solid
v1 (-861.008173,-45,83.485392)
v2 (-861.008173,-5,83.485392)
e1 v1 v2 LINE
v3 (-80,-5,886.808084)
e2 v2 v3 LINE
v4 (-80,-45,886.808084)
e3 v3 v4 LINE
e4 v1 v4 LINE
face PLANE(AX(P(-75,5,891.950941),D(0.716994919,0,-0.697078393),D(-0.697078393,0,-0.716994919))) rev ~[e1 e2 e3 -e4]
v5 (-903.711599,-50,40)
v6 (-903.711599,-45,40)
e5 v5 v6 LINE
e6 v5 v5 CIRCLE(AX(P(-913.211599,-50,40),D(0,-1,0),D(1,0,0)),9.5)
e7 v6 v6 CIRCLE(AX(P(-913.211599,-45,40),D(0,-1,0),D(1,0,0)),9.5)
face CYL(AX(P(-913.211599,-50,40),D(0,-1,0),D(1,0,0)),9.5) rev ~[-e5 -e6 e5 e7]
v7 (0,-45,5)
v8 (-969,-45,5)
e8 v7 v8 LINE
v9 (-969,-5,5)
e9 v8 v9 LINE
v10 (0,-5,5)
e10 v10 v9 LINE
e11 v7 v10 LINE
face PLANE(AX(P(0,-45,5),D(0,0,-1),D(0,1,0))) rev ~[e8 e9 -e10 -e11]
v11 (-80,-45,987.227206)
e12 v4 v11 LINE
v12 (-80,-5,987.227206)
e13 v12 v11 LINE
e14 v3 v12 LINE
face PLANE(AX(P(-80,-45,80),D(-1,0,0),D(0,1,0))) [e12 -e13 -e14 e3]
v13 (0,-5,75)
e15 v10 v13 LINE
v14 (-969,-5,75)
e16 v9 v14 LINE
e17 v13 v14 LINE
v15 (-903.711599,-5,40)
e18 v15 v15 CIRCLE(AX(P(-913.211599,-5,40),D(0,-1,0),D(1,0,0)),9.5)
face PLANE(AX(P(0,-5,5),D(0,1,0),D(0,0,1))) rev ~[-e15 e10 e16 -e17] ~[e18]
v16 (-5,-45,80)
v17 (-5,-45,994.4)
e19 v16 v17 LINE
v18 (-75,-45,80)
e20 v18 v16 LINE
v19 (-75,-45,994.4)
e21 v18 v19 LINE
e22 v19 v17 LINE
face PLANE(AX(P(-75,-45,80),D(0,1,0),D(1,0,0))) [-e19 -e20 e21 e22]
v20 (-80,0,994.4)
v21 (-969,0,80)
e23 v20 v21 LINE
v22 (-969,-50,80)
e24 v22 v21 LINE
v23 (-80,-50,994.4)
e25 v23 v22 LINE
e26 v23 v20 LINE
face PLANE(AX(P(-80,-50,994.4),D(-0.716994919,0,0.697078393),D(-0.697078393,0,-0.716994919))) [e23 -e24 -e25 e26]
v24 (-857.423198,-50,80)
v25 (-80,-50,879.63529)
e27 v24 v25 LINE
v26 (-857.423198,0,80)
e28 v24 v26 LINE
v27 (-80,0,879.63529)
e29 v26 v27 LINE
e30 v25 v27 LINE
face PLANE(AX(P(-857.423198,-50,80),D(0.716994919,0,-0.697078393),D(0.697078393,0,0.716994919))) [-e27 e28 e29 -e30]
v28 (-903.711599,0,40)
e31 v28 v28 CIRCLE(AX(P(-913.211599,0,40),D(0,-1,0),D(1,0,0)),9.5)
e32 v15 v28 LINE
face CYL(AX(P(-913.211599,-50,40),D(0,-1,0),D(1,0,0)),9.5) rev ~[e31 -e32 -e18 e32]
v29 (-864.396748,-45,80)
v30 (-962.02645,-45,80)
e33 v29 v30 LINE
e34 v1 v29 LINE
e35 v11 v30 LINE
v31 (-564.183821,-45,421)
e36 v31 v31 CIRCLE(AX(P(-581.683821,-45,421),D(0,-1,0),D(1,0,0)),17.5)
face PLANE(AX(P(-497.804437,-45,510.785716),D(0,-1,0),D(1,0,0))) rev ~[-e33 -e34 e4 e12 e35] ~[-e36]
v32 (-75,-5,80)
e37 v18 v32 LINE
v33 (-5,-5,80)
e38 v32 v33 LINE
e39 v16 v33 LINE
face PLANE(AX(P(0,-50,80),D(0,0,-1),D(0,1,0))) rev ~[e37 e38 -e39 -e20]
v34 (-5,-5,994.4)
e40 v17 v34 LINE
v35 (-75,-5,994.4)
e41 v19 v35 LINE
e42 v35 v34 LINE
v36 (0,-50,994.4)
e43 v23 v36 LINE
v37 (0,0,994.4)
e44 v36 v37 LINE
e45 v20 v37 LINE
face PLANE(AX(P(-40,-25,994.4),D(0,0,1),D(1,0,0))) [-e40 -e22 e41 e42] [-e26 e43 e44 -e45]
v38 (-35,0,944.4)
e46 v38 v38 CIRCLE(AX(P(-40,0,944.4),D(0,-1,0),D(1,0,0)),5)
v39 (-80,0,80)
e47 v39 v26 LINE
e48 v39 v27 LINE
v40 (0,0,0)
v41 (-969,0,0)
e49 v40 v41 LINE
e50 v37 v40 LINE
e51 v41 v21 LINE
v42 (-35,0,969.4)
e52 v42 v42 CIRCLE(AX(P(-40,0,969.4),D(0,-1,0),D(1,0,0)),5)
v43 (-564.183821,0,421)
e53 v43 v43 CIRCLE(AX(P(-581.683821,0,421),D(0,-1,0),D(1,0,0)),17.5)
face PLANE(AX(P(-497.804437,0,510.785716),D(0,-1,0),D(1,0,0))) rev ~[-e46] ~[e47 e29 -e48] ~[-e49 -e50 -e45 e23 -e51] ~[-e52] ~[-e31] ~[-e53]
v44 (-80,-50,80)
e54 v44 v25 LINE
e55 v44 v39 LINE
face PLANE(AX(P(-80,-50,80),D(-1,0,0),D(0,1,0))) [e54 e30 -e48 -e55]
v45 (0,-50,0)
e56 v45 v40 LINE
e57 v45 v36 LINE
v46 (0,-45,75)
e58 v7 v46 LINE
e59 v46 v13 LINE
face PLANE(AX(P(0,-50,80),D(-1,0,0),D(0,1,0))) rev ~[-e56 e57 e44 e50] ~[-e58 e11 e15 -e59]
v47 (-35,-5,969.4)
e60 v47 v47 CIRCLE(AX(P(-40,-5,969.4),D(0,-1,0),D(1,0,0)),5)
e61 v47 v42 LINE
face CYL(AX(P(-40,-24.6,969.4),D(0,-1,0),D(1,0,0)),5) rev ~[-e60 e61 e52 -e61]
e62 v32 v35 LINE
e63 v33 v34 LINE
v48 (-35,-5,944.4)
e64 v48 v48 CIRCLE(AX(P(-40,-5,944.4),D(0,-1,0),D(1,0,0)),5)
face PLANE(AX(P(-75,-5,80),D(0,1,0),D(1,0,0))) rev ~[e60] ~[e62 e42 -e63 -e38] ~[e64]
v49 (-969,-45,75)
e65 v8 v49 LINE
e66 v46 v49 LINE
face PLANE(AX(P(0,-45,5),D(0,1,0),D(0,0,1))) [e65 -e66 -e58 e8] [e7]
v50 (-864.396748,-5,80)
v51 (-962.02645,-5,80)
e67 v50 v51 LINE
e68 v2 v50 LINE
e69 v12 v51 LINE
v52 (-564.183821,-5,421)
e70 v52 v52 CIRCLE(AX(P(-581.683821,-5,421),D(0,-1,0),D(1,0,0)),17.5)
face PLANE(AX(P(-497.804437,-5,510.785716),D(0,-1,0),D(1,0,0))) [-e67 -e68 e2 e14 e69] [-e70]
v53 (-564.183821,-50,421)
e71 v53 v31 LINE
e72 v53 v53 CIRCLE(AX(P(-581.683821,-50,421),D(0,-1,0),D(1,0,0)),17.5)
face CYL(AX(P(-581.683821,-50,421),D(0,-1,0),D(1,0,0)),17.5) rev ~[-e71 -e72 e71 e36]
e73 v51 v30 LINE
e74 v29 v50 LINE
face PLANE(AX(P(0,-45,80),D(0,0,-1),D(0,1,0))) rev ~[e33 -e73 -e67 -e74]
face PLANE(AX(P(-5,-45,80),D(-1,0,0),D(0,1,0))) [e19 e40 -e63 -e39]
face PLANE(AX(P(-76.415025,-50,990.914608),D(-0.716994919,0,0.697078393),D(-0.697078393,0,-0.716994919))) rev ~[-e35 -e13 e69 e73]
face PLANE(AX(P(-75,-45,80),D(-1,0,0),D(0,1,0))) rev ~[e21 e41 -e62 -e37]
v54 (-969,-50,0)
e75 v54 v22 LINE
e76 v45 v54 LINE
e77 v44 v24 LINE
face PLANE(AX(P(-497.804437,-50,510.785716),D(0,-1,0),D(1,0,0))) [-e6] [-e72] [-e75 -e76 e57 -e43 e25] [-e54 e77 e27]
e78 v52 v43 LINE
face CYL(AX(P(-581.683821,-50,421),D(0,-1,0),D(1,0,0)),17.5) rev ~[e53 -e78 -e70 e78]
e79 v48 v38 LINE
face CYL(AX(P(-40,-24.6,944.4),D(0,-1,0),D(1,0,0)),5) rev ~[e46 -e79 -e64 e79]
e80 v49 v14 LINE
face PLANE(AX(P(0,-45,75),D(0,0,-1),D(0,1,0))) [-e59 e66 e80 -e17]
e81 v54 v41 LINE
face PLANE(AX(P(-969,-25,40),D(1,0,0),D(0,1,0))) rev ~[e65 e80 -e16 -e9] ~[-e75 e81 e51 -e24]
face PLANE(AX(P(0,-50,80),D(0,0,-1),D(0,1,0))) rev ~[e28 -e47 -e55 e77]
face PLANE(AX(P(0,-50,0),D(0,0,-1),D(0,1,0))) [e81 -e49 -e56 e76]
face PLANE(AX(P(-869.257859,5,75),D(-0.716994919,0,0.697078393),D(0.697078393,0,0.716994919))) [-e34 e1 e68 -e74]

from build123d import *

# Parameters (mm, degrees)
F0_W         = 50
F0_H         = 80
F0_W_2       = 40
F0_H_2       = 70
F1_DEPTH     = 969
F2_W         = 80
F2_H         = 50
F2_W_2       = 70
F2_H_2       = 40
F3_DEPTH     = 914.4
F5_DEPTH     = 50
F6_R         = 17.5
F6_R_2       = 9.5
F7_DEPTH     = 50.001
F8_T         = 5
F8_T3_DEPTH  = 60
F8_T5_DEPTH  = 979
F8_T7_DEPTH  = 924.4
F8_T9_DEPTH  = 80
F8_T11_DEPTH = 50
F9_START     = -25.4
F6_R_3       = 5
F9_DEPTH     = 27.432


# Not quite as in the source:
# - a shell that OpenCascade refuses in one call is made with other operations: the cavity is built on its own and cut out


with BuildPart() as f1:
    # F0 (on Right) → F1 (new body)
    with BuildSketch(Plane.YZ):
        with Locations((-25, 40)):
            Rectangle(F0_W, F0_H)
        with Locations((-25, 40)):
            Rectangle(F0_W_2, F0_H_2, mode=Mode.SUBTRACT)
    extrude(amount=-F1_DEPTH)

    # F2 (on face) → F3 (join)
    with BuildSketch(Plane.XY.offset(80)):
        with Locations((-40, -25)):
            Rectangle(F2_W, F2_H)
        with Locations((-40, -25)):
            Rectangle(F2_W_2, F2_H_2, mode=Mode.SUBTRACT)
    extrude(amount=F3_DEPTH)

    # F4 (on face) → F5 (join)
    with BuildSketch(Plane.XZ.offset(50)):
        Polygon((-80, 994.4), (-969, 80), (-857.4231981277, 80), (-80, 879.6352895028), align=None)
    extrude(amount=-F5_DEPTH)

    # F6 (on face) → F7 (cut, through all)
    with BuildSketch(Plane.XZ.offset(50)):
        with Locations((-581.6838212861, 421)):
            Circle(F6_R)
        with Locations((-913.2115990639, 40)):
            Circle(F6_R_2)
    extrude(amount=-F7_DEPTH, mode=Mode.SUBTRACT)

    # F8: shell of thickness 5, made by hand


with BuildPart() as f8_core1:
    # F8_t2: copy of F1
    add(f1.part)

    # the walls: a layer under each face that stays
    f8_faces = [f8_core1.faces().sort_by_distance(p)[0] for p in [
        (-484.5, -25, 0),
        (-484.5, -50, 497.2),
        (-484.5, 0, 497.2),
        (0, -25, 497.2),
        (-969, -46.4285714286, 5.7142857143),
        (-524.5, -25, 537.2),
        (-74.2857142857, -46.4285714286, 994.4),
        (-922.7115990639, -47.5, 40),
        (-468.7115990639, -25, 80),
        (-80, -25, 479.8176447514),
        (-468.7115990639, -25, 479.8176447514),
        (-922.7115990639, -2.5, 40),
        (-484.5, -25, 75),
        (-484.5, -5, 40),
        (-484.5, -25, 5),
        (-484.5, -45, 40),
        (-40, -5, 537.2),
        (-5, -25, 537.2),
        (-40, -45, 537.2),
        (-75, -25, 537.2),
        (-40, -25, 80),
    ]]
    thicken(f8_faces, amount=-F8_T, mode=Mode.SUBTRACT)

    # F8_s4 → F8_t3 (cut)
    with BuildSketch(Plane.XZ.offset(-5)):
        Polygon((-80.05, 80.05), (-80, 75), (-75, 75), (-75, 80), align=None)
        Polygon((-857.3873483818, 80.0151460803), (-857.4231981277, 75), (-869.2578593558, 75), (-861.0081727218, 83.4853919665), align=None)
        Polygon((-80.0141502541, 879.6004355831), (-75, 879.6352895028), (-75, 891.9509410517), (-83.5849745941, 883.1206814692), align=None)
    extrude(amount=F8_T3_DEPTH, mode=Mode.SUBTRACT)

    # F8_s6 → F8_t5 (cut)
    with BuildSketch(Plane.YZ.offset(-974)):
        Polygon((-44.95, 74.95), (-45, 80), (-50, 80), (-50, 75), align=None)
        Polygon((-5.05, 74.95), (-5, 80), (0, 80), (0, 75), align=None)
        Polygon((-5.05, 5.05), (0, 5), (0, 0), (-5, 0), align=None)
        Polygon((-44.95, 5.05), (-45, 0), (-50, 0), (-50, 5), align=None)
    extrude(amount=F8_T5_DEPTH, mode=Mode.SUBTRACT)

    # F8_s8 → F8_t7 (cut)
    with BuildSketch(Plane.XY.offset(75)):
        Polygon((-74.95, -5.05), (-75, 0), (-80, 0), (-80, -5), align=None)
        Polygon((-5.05, -5.05), (-5, 0), (0, 0), (0, -5), align=None)
        Polygon((-5.05, -44.95), (0, -45), (0, -50), (-5, -50), align=None)
        Polygon((-74.95, -44.95), (-75, -50), (-80, -50), (-80, -45), align=None)
    extrude(amount=F8_T7_DEPTH, mode=Mode.SUBTRACT)

    # F8_s10 → F8_t9 (cut)
    with BuildSketch(Plane.YZ.offset(-80)):
        Polygon((-5.05, 80.05), (0, 80), (0, 75), (-5, 75), align=None)
        Polygon((-44.95, 80.05), (-50, 80), (-50, 75), (-45, 75), align=None)
    extrude(amount=F8_T9_DEPTH, mode=Mode.SUBTRACT)

    # F8_s12 → F8_t11 (cut)
    with BuildSketch(Plane.XZ):
        Polygon((-5.05, 80.05), (0, 80), (0, 75), (-5, 75), align=None)
        Polygon((-74.95, 80.05), (-80, 80), (-80, 75), (-75, 75), align=None)
    extrude(amount=F8_T11_DEPTH, mode=Mode.SUBTRACT)


with BuildPart() as f1_1:
    add(f1.part)

    # what is left inside the walls is the cavity
    f8_cavity = [f8_core1.part.solids().sort_by_distance(p)[0] for p in [
        (-635.349987, -5.05, 363.508502),
    ]]
    add(f8_cavity, mode=Mode.SUBTRACT)

    # F6 (on face) → F9 (cut)
    with BuildSketch(Plane.XZ.offset(50).offset(F9_START)):
        with Locations((-40, 969.4)):
            Circle(F6_R_3)
        with Locations((-40, 944.4)):
            Circle(F6_R_3)
    extrude(amount=-F9_DEPTH, mode=Mode.SUBTRACT)


solid = f1_1.part
